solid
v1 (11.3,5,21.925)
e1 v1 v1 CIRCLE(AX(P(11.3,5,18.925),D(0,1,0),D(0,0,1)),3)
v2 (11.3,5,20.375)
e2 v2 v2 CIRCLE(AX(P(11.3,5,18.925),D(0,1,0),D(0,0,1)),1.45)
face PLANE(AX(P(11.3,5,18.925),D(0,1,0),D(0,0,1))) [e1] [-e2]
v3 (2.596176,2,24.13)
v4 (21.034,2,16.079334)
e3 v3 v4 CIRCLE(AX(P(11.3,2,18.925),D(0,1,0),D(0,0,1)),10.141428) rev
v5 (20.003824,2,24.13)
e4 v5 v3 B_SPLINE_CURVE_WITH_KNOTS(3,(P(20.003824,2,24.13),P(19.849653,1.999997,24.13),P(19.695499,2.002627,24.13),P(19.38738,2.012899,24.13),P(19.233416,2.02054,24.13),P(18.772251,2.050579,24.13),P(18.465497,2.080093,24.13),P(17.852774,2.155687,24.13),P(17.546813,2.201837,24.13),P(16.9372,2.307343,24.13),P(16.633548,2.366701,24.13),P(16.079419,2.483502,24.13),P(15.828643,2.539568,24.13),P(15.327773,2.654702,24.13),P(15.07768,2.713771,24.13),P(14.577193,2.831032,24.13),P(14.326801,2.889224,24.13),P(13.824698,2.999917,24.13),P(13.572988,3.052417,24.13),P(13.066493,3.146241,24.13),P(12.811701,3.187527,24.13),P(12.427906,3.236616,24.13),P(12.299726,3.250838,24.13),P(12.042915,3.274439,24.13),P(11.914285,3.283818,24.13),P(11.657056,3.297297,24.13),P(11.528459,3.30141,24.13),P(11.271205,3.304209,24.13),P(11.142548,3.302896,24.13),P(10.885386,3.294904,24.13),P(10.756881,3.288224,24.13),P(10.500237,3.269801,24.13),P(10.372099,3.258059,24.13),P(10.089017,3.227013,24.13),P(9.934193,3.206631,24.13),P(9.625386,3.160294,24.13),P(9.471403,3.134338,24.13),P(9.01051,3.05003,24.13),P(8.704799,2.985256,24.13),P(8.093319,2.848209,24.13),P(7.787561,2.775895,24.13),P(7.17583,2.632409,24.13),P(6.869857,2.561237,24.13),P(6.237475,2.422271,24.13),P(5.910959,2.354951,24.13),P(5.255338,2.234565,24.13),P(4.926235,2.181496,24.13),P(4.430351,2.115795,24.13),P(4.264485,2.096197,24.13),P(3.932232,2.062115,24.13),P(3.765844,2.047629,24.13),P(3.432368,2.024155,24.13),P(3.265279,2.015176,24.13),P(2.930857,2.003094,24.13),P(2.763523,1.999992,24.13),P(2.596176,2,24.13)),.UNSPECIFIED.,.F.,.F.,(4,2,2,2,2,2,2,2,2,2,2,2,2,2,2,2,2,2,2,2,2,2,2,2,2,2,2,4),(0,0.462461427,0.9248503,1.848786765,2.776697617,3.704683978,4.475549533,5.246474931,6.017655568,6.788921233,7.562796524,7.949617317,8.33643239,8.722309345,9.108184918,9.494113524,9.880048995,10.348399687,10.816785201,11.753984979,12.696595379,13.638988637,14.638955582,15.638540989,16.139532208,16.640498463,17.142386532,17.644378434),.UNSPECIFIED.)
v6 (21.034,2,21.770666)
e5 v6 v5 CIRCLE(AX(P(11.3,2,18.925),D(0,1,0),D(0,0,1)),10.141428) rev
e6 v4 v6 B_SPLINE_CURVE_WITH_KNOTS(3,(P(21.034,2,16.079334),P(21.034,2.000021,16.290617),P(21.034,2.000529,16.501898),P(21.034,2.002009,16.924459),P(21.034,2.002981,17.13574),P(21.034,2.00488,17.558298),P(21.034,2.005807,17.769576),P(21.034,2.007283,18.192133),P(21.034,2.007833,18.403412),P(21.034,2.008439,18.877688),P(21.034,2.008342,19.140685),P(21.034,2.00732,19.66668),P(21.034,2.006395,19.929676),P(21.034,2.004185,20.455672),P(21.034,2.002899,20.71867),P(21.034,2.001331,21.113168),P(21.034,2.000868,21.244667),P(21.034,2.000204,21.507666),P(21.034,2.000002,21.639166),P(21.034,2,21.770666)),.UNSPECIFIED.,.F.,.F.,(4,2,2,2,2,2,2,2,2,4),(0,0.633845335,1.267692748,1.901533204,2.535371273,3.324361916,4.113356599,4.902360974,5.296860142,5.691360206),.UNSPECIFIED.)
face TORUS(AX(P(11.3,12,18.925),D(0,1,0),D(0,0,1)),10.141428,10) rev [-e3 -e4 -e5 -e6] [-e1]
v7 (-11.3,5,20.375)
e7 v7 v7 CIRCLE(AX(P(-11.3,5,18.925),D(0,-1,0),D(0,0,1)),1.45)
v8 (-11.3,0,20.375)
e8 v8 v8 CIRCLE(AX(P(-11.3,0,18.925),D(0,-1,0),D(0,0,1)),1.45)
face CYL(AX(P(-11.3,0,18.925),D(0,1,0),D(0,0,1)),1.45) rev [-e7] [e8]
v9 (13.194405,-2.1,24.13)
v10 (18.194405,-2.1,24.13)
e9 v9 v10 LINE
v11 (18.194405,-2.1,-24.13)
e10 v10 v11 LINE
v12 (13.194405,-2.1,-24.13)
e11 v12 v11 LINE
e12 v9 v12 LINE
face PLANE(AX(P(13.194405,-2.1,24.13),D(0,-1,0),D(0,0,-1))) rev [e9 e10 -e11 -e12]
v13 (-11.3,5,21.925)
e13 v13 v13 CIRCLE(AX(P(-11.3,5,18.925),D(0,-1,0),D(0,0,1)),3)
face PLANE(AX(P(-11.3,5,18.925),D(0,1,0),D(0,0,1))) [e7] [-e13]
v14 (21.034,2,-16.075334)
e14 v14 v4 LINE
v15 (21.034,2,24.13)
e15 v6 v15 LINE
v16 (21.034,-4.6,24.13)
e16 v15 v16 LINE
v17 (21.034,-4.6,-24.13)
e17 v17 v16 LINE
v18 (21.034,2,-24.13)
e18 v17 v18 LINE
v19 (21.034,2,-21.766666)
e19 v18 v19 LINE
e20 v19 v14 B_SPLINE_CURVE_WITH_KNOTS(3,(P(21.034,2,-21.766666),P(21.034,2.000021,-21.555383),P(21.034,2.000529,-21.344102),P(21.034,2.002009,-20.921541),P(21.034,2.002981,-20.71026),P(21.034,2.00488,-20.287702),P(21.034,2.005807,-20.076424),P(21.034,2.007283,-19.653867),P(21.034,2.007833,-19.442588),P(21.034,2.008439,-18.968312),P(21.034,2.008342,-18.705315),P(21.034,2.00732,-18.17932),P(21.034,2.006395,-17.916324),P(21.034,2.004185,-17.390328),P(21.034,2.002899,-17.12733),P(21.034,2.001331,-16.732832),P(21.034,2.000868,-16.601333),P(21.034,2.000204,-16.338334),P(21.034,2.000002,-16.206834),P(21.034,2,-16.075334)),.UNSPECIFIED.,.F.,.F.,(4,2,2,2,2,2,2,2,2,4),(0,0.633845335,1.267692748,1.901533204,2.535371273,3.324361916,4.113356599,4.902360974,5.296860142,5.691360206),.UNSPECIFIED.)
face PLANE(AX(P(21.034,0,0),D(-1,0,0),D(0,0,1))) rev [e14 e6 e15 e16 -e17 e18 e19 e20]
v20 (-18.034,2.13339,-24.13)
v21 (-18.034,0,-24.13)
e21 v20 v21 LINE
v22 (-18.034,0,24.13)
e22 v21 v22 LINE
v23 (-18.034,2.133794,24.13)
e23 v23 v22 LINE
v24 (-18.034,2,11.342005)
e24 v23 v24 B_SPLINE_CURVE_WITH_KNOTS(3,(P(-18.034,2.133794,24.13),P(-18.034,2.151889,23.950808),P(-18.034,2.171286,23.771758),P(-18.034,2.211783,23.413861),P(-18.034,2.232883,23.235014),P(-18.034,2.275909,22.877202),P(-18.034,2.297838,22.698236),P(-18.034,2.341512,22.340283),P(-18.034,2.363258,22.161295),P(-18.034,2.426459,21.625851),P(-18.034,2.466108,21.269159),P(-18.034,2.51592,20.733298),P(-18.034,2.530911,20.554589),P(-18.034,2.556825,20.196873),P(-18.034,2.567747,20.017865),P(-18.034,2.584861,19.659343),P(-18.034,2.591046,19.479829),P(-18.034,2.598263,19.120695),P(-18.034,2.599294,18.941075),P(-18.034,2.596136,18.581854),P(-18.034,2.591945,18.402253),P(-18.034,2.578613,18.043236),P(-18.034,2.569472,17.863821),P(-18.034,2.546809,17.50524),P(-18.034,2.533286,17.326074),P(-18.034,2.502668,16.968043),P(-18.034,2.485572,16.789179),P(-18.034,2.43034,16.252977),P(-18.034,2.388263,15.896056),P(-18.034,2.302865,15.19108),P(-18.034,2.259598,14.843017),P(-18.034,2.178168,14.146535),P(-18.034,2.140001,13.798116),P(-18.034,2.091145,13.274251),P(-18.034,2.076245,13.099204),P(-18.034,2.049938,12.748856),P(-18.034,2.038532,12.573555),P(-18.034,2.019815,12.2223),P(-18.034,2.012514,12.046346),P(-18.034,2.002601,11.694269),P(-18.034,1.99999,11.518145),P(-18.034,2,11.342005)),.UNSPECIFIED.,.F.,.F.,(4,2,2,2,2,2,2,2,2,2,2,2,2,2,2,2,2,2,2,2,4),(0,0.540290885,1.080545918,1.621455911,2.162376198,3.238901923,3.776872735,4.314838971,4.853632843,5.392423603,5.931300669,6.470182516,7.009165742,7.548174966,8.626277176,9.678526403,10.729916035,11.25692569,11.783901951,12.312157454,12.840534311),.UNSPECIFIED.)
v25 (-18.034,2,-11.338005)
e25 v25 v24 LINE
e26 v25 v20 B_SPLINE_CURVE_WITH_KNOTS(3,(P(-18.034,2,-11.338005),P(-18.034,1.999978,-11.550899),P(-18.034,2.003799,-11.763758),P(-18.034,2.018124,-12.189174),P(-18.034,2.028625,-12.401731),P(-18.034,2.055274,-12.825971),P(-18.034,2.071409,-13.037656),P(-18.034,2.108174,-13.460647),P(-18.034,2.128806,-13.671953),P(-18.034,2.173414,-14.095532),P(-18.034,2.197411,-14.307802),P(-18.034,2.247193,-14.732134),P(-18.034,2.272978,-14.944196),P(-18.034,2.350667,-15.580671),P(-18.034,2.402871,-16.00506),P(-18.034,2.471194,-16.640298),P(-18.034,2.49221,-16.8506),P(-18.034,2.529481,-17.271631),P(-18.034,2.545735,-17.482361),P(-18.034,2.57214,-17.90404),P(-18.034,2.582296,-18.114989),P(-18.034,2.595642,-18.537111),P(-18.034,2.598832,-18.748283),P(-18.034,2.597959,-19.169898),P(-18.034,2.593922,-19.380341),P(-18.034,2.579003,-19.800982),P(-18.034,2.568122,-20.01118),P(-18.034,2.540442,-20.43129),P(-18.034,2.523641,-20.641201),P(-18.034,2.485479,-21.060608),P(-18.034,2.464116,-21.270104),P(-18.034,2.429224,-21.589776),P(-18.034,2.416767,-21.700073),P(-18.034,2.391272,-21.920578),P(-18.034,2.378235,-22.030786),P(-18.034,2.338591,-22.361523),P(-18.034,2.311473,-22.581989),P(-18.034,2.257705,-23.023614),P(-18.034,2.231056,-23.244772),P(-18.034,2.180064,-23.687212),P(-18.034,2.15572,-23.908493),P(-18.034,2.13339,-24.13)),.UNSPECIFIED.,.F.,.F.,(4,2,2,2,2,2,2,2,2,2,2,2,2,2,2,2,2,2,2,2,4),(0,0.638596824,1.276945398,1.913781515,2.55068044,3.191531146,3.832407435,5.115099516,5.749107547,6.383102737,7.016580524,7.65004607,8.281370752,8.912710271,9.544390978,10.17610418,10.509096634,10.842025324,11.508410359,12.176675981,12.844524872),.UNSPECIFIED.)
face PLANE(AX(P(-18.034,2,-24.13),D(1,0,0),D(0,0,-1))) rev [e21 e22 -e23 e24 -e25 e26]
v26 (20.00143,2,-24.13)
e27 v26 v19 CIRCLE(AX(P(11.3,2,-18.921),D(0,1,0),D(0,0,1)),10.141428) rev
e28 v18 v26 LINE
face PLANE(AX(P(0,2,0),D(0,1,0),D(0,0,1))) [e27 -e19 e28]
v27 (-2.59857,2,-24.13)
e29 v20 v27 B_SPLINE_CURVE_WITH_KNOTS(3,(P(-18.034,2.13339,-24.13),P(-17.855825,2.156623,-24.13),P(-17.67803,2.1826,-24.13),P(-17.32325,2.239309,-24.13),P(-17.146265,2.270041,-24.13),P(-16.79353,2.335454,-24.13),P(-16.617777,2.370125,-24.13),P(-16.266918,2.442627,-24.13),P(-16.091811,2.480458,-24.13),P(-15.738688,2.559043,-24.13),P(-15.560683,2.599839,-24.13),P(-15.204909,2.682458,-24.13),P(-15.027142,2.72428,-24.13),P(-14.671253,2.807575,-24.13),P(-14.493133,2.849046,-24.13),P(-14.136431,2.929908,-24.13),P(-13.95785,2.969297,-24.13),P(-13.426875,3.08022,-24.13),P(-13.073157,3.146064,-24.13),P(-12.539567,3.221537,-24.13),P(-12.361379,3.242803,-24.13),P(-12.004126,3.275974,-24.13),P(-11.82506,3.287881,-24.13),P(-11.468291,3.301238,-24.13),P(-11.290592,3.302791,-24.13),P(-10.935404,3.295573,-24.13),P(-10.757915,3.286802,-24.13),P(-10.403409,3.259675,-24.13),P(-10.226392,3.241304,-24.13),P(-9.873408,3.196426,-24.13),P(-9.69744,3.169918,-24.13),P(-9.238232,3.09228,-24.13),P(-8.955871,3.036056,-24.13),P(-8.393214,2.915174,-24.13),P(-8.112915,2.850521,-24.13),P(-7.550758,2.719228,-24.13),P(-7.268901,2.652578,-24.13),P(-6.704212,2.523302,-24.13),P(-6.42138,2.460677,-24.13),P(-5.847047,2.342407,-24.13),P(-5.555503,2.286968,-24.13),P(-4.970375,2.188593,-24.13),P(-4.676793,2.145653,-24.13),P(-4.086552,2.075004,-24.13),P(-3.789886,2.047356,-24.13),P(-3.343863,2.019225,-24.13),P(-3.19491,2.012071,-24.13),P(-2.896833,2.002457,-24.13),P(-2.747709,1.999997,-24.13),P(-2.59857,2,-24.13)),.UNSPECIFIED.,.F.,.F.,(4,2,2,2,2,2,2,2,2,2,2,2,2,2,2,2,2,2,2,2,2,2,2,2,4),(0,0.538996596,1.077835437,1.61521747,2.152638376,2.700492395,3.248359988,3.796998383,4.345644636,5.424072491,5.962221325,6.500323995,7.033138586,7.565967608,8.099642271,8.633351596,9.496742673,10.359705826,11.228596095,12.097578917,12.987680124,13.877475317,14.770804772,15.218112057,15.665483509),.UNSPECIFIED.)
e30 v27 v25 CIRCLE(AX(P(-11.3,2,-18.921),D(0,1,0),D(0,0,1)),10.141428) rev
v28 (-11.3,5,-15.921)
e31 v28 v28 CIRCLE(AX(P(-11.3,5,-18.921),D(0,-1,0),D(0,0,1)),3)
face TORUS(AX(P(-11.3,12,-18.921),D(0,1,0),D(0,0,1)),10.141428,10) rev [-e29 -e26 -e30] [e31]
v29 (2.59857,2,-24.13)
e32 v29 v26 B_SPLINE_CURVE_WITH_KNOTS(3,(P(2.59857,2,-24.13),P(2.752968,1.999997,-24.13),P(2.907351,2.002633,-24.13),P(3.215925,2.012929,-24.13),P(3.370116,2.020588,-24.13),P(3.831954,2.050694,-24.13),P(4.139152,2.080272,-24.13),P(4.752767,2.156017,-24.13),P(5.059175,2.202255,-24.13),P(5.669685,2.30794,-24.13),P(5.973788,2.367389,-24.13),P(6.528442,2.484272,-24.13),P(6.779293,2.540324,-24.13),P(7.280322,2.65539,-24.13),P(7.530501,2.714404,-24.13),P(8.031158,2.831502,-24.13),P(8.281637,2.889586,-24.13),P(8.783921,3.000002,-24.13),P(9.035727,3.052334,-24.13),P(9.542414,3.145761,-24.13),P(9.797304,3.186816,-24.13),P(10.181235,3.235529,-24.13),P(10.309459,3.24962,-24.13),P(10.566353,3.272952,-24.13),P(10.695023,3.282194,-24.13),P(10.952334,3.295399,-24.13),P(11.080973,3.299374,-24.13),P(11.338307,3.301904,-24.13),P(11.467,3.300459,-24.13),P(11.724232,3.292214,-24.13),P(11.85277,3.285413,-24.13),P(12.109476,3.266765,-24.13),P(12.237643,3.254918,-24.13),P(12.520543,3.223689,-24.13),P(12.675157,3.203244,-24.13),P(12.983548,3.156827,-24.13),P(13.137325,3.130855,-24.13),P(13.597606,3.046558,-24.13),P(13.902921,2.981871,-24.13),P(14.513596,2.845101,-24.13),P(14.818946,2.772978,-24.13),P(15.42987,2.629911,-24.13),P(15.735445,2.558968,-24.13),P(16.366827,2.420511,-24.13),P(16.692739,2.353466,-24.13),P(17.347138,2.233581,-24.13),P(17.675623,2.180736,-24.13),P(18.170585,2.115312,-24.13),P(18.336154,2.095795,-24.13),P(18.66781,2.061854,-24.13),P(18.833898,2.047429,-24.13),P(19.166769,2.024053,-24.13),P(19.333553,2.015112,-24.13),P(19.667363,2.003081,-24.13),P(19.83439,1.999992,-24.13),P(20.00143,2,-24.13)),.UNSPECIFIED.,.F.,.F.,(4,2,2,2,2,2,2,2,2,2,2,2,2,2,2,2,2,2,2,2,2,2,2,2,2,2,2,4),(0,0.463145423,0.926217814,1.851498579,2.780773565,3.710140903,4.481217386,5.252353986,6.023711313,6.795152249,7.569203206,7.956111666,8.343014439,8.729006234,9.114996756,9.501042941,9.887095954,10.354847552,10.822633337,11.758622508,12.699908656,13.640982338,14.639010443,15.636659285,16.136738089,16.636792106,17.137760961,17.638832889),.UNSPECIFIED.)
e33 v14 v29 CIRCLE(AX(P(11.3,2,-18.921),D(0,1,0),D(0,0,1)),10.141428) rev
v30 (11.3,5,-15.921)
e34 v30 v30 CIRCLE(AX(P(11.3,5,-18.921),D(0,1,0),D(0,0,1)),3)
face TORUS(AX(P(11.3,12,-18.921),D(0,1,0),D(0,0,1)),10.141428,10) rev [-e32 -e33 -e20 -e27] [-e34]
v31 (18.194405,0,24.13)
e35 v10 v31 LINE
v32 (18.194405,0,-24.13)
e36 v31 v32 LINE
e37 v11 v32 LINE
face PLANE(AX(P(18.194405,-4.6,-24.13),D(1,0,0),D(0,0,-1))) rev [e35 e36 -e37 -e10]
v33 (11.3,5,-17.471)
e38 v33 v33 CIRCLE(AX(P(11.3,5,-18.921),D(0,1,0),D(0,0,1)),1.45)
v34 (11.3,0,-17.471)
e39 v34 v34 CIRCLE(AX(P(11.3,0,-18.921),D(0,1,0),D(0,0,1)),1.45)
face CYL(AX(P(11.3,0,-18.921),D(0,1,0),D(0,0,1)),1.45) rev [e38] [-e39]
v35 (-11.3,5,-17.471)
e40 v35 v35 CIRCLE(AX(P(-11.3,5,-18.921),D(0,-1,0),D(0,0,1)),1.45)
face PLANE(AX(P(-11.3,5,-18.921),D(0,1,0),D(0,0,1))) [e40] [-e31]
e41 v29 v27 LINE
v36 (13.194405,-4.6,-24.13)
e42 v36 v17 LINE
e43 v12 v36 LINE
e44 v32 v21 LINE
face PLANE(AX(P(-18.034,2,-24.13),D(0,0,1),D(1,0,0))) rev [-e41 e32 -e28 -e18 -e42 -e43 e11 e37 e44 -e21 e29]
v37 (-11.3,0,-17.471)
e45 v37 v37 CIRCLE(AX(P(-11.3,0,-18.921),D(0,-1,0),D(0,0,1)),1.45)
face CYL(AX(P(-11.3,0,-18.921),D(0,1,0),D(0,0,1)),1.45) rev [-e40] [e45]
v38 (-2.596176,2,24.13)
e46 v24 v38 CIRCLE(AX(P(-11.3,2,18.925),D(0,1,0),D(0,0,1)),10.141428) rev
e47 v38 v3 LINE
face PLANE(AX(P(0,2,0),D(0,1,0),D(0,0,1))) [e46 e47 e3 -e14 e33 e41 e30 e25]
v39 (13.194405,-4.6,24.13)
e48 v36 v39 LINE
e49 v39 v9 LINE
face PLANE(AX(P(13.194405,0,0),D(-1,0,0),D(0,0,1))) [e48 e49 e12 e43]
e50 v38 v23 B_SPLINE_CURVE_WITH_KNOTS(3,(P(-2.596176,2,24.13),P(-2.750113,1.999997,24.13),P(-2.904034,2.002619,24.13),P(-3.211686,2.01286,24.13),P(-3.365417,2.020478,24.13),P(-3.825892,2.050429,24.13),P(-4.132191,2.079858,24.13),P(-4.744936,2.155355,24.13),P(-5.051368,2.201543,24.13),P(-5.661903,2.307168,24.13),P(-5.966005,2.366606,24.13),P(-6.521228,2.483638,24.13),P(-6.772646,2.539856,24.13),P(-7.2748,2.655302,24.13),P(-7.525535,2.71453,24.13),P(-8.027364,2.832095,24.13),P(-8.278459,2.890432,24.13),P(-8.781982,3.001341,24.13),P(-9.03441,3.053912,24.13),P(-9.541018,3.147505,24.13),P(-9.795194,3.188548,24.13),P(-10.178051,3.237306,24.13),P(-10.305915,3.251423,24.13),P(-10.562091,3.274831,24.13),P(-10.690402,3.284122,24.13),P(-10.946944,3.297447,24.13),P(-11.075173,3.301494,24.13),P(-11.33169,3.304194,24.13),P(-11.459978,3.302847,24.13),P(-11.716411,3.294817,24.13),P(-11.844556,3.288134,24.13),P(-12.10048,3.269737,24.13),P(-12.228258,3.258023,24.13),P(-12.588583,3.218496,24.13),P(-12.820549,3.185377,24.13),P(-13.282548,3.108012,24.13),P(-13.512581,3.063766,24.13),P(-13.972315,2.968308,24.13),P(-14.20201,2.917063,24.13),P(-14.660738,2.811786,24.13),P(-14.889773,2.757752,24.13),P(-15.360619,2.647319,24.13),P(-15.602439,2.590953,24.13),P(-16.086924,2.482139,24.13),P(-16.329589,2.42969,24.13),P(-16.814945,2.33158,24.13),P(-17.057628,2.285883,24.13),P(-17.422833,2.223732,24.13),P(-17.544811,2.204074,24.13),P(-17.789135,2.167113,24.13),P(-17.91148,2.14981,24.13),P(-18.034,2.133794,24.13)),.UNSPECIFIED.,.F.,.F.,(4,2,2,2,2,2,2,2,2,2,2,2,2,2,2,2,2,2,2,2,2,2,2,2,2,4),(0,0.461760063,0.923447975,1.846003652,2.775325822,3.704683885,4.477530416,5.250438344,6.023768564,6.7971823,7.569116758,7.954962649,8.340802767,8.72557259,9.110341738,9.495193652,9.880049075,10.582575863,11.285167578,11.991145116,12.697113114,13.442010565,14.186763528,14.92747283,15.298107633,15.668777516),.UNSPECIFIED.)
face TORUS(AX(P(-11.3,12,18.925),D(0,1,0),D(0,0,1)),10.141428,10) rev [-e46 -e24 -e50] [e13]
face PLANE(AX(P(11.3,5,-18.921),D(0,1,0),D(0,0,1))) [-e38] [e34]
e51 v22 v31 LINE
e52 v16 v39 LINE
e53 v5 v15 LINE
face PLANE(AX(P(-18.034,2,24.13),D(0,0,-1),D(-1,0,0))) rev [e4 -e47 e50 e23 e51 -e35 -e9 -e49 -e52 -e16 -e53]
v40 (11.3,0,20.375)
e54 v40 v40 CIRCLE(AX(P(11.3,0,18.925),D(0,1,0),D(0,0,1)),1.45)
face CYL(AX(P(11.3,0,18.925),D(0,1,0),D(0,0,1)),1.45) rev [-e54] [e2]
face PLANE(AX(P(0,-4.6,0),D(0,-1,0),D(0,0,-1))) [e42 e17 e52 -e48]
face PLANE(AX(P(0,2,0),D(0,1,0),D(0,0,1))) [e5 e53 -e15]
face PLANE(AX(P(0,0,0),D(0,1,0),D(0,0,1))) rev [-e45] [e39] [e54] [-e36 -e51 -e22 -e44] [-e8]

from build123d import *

# Parameters (mm, degrees)
ESQUISSE1_W             = 36.068
ESQUISSE1_H             = 48.26
BOSS_EXTRU_1_DEPTH      = 2
ESQUISSE4_R             = 3
BOSS_EXTRU_2_DEPTH      = 3
ESQUISSE6_R             = 1.45
ENL_V_MAT_EXTRU_1_DEPTH = 31.536569159
ESQUISSE10_W            = 48.26
ESQUISSE10_H            = 2
BOSS_EXTRU_3_DEPTH      = 3
ESQUISSE11_W            = 2.839594579
ESQUISSE11_H            = 48.26
BOSS_EXTRU_4_DEPTH      = 4.6
ESQUISSE12_W            = 48.26
ESQUISSE12_H            = 2.5
BOSS_EXTRU_5_DEPTH      = 5
CONG_1_R                = 10
CONG_2_R                = 10


with BuildPart() as part:
    # Esquisse1 → Boss.-Extru.1 (new body)
    with BuildSketch(Plane(origin=(0, 0, 0), x_dir=(1, 0, 0), z_dir=(0, 1, 0))):
        Rectangle(ESQUISSE1_W, ESQUISSE1_H)
    extrude(amount=BOSS_EXTRU_1_DEPTH)

    # Esquisse4 → Boss.-Extru.2 (add)
    with BuildSketch(Plane(origin=(0, 2, 0), x_dir=(1, 0, 0), z_dir=(0, 1, 0))):
        with Locations(Location((11.3, 18.921, 0), (0, 0, 270))):
            Circle(ESQUISSE4_R)
        with Locations(Location((11.3, -18.925, 0), (0, 0, 270))):
            Circle(ESQUISSE4_R)
    boss_extru_2 = extrude(amount=BOSS_EXTRU_2_DEPTH)

    # Esquisse6 → Enlèv. mat.-Extru.1 (cut, through all)
    with BuildSketch(Plane(origin=(0, 5, 0), x_dir=(1, 0, 0), z_dir=(0, 1, 0))):
        with Locations(Location((11.3, 18.921, 0), (0, 0, 270))):
            Circle(ESQUISSE6_R)
        with Locations(Location((11.3, -18.925, 0), (0, 0, 270))):
            Circle(ESQUISSE6_R)
    enl_v_mat_extru_1 = extrude(amount=-ENL_V_MAT_EXTRU_1_DEPTH, mode=Mode.SUBTRACT)

    # Symétrie1: Boss.-Extru.2, Enlèv. mat.-Extru.1 across plane
    add(boss_extru_2.mirror(Plane(origin=(0, 0, 0), x_dir=(0, 0, 1), z_dir=(1, 0, 0))))
    add(enl_v_mat_extru_1.mirror(Plane(origin=(0, 0, 0), x_dir=(0, 0, 1), z_dir=(1, 0, 0))), mode=Mode.SUBTRACT)

    # Esquisse10 → Boss.-Extru.3 (add)
    with BuildSketch(Plane(origin=(18.034, 0, 0), x_dir=(0, 0, -1), z_dir=(1, 0, 0))):
        with Locations((0, 1)):
            Rectangle(ESQUISSE10_W, ESQUISSE10_H)
    extrude(amount=BOSS_EXTRU_3_DEPTH)

    # Esquisse11 → Boss.-Extru.4 (add)
    with BuildSketch(Plane(origin=(0, 0, 0), x_dir=(-1, 0, 0), z_dir=(0, -1, 0))):
        with Locations((-19.614202711, 0)):
            Rectangle(ESQUISSE11_W, ESQUISSE11_H)
    extrude(amount=BOSS_EXTRU_4_DEPTH)

    # Esquisse12 → Boss.-Extru.5 (add)
    with BuildSketch(Plane.ZY.offset(-18.194405421)):
        with Locations((0, -3.35)):
            Rectangle(ESQUISSE12_W, ESQUISSE12_H)
    extrude(amount=BOSS_EXTRU_5_DEPTH)

    # Congé1
    # the kernel refuses this fillet: 10 mm, written as the material it adds along each edge
    with BuildSketch(Plane(origin=(-11.3, 2, -18.921), x_dir=(0, 0, 1), z_dir=(1, 0, 0))) as cong_1_piece_1_section:
        with BuildLine():
            CenterArc((10.141428429, -10), CONG_1_R, 90, 45.572995999)
            Line((10.141428429, 0), (10.141428429, 0.2))
            Line((10.141428429, 0.2), (3, 0.2))
            Line((3, 0.2), (2.8, 0))
            ThreePointArc((2.8, 0), (2.8, -1.5), (2.857171431, -2.86))
            Line((2.857171431, -2.86), (3, -3))
        make_face()
    cong_1_piece_1 = revolve(axis=Axis((-11.3, 2, -18.921), (0, -1, 0)), mode=Mode.PRIVATE)
    cong_1_piece_1 = split(cong_1_piece_1, bisect_by=Plane(origin=(-14.721075744, 4.069321611, -24.13), z_dir=(0, 0, 1)), keep=Keep.TOP, mode=Mode.PRIVATE)
    cong_1_piece_1 = split(cong_1_piece_1, bisect_by=Plane(origin=(-18.034, 4.069321611, -16.945840998), z_dir=(1, 0, 0)), keep=Keep.TOP, mode=Mode.PRIVATE)
    add(cong_1_piece_1)
    with BuildSketch(Plane(origin=(-11.3, 2, 18.925), x_dir=(0, 0, 1), z_dir=(1, 0, 0))) as cong_1_piece_2_section:
        with BuildLine():
            CenterArc((10.141428429, -10), CONG_1_R, 90, 45.572995999)
            Line((10.141428429, 0), (10.141428429, 0.2))
            Line((10.141428429, 0.2), (3, 0.2))
            Line((3, 0.2), (2.8, 0))
            ThreePointArc((2.8, 0), (2.8, -1.5), (2.857171431, -2.86))
            Line((2.857171431, -2.86), (3, -3))
        make_face()
    cong_1_piece_2 = revolve(axis=Axis((-11.3, 2, 18.925), (0, -1, 0)), mode=Mode.PRIVATE)
    cong_1_piece_2 = split(cong_1_piece_2, bisect_by=Plane(origin=(-11.3, 2.724138959, 24.13), z_dir=(0, 0, -1)), keep=Keep.TOP, mode=Mode.PRIVATE)
    cong_1_piece_2 = split(cong_1_piece_2, bisect_by=Plane(origin=(-18.034, 2.724138959, 12.680212615), z_dir=(1, 0, 0)), keep=Keep.TOP, mode=Mode.PRIVATE)
    add(cong_1_piece_2)

    # Congé2
    # the kernel refuses this fillet: 10 mm, written as the material it adds along each edge
    with BuildSketch(Plane(origin=(11.3, 2, -18.921), x_dir=(0, 0, 1), z_dir=(-1, 0, 0))) as cong_2_piece_1_section:
        with BuildLine():
            CenterArc((10.141428429, 10), CONG_2_R, 224.427004001, 45.572995999)
            Line((10.141428429, 0), (10.141428429, -0.2))
            Line((10.141428429, -0.2), (3, -0.2))
            Line((3, -0.2), (2.8, 0))
            ThreePointArc((2.8, 0), (2.8, 1.5), (2.857171431, 2.86))
            Line((2.857171431, 2.86), (3, 3))
        make_face()
    cong_2_piece_1 = revolve(axis=Axis((11.3, 2, -18.921), (0, 1, 0)), mode=Mode.PRIVATE)
    cong_2_piece_1 = split(cong_2_piece_1, bisect_by=Plane(origin=(14.72056947, 4.068572758, -24.13), z_dir=(0, 0, 1)), keep=Keep.TOP, mode=Mode.PRIVATE)
    cong_2_piece_1 = split(cong_2_piece_1, bisect_by=Plane(origin=(21.034, 4.068572758, -16.946133295), z_dir=(-1, 0, 0)), keep=Keep.TOP, mode=Mode.PRIVATE)
    add(cong_2_piece_1)
    with BuildSketch(Plane(origin=(11.3, 2, 18.925), x_dir=(0, 0, 1), z_dir=(-1, 0, 0))) as cong_2_piece_2_section:
        with BuildLine():
            CenterArc((10.141428429, 10), CONG_2_R, 224.427004001, 45.572995999)
            Line((10.141428429, 0), (10.141428429, -0.2))
            Line((10.141428429, -0.2), (3, -0.2))
            Line((3, -0.2), (2.8, 0))
            ThreePointArc((2.8, 0), (2.8, 1.5), (2.857171431, 2.86))
            Line((2.857171431, 2.86), (3, 3))
        make_face()
    cong_2_piece_2 = revolve(axis=Axis((11.3, 2, 18.925), (0, 1, 0)), mode=Mode.PRIVATE)
    cong_2_piece_2 = split(cong_2_piece_2, bisect_by=Plane(origin=(21.034, 2.723263104, 12.680580548), z_dir=(-1, 0, 0)), keep=Keep.TOP, mode=Mode.PRIVATE)
    cong_2_piece_2 = split(cong_2_piece_2, bisect_by=Plane(origin=(11.3, 2.723263104, 24.13), z_dir=(0, 0, -1)), keep=Keep.TOP, mode=Mode.PRIVATE)
    add(cong_2_piece_2)


solid = part.part
